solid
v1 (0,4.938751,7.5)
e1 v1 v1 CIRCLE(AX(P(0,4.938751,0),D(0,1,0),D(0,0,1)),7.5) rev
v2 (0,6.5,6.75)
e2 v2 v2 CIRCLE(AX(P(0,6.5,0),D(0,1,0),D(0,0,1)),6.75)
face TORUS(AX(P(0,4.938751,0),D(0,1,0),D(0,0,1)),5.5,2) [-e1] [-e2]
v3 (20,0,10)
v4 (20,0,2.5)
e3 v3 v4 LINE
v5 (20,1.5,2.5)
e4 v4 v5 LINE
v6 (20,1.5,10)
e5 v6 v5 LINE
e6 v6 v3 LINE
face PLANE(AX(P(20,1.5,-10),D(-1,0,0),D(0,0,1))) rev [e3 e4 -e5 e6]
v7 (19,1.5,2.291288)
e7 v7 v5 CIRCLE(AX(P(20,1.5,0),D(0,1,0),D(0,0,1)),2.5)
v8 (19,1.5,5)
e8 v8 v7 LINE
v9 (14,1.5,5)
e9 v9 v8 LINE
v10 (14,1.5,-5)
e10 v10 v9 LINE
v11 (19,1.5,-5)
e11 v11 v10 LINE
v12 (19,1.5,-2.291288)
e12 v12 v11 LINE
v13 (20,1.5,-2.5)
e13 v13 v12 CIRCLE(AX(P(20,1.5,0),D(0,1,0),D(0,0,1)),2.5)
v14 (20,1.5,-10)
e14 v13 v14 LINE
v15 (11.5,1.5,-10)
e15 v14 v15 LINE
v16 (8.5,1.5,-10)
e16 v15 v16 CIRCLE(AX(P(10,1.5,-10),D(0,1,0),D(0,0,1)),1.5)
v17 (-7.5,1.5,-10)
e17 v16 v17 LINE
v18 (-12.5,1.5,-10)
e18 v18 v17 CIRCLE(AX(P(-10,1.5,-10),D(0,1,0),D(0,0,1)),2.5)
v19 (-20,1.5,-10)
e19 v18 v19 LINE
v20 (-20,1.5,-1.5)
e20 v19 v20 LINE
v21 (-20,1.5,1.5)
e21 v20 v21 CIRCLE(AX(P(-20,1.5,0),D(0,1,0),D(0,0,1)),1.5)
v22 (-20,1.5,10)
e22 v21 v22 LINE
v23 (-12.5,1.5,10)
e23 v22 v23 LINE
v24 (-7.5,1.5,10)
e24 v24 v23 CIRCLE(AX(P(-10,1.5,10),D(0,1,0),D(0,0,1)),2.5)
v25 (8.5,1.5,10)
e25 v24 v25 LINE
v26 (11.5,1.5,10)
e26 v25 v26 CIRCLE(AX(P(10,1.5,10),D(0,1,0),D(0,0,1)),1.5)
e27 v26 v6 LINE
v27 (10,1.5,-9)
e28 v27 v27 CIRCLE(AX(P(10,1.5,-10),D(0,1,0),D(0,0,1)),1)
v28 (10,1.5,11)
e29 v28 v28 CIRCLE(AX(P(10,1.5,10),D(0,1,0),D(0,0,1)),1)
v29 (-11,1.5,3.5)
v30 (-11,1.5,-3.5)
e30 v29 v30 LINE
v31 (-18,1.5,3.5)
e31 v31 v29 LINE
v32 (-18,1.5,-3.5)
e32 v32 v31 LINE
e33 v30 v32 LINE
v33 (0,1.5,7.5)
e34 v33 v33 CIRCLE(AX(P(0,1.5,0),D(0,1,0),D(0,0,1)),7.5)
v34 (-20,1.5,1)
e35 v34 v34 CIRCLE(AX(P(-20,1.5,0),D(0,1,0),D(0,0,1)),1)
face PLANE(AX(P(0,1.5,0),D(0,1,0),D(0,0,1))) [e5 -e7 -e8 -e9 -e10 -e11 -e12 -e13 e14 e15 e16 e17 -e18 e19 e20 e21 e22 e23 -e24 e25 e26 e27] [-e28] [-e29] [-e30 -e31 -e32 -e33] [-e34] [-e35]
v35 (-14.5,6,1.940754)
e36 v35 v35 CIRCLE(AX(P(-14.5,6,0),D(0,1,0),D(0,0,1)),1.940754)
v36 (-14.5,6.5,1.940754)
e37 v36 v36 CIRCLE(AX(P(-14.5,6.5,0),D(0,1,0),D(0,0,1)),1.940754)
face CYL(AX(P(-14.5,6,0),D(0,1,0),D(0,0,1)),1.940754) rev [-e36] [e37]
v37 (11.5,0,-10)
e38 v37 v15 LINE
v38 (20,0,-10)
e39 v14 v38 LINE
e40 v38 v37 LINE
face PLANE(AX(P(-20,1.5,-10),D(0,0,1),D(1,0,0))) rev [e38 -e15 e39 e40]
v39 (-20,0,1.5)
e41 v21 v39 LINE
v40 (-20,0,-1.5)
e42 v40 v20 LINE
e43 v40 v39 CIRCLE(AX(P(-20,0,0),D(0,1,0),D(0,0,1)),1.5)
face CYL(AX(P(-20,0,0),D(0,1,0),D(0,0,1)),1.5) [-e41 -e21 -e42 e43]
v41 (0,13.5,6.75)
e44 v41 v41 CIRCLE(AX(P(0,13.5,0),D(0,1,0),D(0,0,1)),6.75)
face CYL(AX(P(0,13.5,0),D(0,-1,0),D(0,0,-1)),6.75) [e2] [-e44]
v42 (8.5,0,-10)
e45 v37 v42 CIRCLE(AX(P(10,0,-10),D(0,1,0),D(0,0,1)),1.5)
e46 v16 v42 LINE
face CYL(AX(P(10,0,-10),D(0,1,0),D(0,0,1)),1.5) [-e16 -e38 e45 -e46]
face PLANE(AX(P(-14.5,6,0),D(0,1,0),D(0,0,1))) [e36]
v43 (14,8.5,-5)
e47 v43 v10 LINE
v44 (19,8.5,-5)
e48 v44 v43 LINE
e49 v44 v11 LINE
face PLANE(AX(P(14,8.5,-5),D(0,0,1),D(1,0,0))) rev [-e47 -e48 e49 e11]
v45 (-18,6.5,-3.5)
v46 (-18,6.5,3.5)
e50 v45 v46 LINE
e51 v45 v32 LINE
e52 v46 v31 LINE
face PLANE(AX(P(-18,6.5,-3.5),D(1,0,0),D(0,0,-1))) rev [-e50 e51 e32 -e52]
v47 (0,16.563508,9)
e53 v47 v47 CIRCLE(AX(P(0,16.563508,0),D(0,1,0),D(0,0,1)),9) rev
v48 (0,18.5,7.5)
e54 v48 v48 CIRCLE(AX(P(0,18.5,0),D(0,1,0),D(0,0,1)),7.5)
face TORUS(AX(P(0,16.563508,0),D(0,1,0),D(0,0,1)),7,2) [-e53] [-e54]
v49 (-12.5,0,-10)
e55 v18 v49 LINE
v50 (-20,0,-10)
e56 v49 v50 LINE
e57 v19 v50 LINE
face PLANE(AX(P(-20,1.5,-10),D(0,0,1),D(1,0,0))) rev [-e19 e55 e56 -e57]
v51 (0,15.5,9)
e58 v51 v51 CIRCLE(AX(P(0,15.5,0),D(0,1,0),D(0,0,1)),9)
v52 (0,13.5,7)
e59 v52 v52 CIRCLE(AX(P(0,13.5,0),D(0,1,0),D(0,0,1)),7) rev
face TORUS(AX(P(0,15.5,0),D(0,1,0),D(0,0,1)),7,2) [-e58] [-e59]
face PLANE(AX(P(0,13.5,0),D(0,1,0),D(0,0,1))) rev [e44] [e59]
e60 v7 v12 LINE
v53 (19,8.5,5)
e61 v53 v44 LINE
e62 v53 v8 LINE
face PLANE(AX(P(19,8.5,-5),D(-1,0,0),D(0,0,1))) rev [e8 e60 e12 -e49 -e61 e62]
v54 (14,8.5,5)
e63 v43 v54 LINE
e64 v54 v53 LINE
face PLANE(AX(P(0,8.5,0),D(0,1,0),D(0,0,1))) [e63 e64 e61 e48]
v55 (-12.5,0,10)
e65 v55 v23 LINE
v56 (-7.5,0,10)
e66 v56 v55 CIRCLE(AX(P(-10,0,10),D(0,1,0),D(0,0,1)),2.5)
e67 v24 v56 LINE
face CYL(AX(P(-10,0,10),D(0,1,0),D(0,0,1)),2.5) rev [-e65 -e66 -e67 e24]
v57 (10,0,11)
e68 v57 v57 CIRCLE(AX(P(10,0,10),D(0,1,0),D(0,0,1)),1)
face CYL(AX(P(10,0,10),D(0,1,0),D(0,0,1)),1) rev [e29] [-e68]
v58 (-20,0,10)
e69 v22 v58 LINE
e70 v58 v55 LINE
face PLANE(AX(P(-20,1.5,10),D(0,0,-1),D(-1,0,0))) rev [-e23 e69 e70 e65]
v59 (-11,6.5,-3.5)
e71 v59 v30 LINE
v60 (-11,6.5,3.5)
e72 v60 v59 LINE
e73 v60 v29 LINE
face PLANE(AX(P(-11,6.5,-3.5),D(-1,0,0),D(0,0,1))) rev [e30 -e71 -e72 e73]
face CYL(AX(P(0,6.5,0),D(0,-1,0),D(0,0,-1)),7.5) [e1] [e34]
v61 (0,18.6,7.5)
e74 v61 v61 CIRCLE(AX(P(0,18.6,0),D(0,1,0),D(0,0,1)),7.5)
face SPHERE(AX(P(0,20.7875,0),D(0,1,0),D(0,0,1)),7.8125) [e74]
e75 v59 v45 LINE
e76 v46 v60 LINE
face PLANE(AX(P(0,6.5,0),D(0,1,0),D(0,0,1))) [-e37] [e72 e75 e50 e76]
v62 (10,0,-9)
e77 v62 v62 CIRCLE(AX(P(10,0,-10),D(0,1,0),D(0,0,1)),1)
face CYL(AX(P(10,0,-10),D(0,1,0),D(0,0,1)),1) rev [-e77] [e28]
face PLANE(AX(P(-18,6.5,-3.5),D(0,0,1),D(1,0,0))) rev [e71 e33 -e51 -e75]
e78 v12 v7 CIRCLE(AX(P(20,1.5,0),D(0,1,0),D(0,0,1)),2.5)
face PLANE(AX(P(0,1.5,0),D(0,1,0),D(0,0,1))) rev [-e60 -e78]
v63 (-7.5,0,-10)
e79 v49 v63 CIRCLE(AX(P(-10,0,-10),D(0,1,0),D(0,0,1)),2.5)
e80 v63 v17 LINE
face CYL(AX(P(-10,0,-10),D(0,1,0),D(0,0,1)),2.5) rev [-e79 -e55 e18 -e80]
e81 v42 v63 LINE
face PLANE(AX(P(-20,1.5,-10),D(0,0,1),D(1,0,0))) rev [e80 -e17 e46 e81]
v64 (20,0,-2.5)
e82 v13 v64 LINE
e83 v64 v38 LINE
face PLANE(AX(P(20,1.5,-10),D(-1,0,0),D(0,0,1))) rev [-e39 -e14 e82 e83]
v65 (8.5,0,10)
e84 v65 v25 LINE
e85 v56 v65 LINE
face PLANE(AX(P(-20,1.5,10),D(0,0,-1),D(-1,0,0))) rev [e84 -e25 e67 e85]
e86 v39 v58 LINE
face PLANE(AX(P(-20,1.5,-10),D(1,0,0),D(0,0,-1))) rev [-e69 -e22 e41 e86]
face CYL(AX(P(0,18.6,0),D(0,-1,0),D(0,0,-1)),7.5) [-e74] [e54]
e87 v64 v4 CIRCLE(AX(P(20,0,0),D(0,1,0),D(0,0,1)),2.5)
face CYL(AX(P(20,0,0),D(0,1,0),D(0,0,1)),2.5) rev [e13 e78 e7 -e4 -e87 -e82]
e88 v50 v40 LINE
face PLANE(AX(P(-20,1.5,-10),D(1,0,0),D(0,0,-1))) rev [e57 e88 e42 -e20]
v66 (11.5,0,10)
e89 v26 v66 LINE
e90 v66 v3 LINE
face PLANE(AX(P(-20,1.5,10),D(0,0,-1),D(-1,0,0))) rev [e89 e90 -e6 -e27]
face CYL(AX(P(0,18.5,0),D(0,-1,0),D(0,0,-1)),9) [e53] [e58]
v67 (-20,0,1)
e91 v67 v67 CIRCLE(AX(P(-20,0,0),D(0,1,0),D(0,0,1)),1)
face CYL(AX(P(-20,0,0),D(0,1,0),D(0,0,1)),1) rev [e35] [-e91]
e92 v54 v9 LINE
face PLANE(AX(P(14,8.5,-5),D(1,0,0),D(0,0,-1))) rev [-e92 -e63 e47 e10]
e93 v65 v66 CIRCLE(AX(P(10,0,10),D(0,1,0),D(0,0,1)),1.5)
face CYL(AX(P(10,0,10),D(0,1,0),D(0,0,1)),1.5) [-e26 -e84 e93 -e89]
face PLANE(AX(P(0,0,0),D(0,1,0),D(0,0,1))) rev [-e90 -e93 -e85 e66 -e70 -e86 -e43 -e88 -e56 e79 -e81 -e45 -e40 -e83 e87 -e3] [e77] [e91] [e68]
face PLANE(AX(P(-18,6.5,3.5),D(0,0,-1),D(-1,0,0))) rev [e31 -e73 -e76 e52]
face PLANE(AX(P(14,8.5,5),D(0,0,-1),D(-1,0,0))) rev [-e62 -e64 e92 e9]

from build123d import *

# Parameters (mm, degrees)
SKETCH1_W           = 40
SKETCH1_H           = 20
BOSS_EXTRUDE1_DEPTH = 1.5
SKETCH2_R           = 1.5
BOSS_EXTRUDE2_DEPTH = 1.5
SKETCH3_R           = 1
SKETCH3_R_2         = 2.5
CUT_EXTRUDE1_DEPTH  = 1.5
SKETCH4_W           = 7
SKETCH4_H           = 7
BOSS_EXTRUDE3_DEPTH = 5
SKETCH5_R           = 1.940753899
CUT_EXTRUDE2_DEPTH  = 0.5
SKETCH6_W           = 5
SKETCH6_H           = 10
BOSS_EXTRUDE4_DEPTH = 7
SKETCH7_R           = 7.5
BOSS_EXTRUDE5_DEPTH = 5
SKETCH8_R           = 6.75
BOSS_EXTRUDE6_DEPTH = 7
SKETCH9_R           = 9
BOSS_EXTRUDE7_DEPTH = 5
SKETCH11_R          = 7.5
BOSS_EXTRUDE8_DEPTH = 0.1
DOME1_FACE_RADIUS   = 7.5
DOME1_HEIGHT        = 10
FILLET2_R           = 2
FILLET4_R           = 2


with BuildPart() as part:
    # Sketch1 → Boss-Extrude1 (new body)
    with BuildSketch(Plane(origin=(0, 0, 0), x_dir=(1, 0, 0), z_dir=(0, 1, 0))):
        Rectangle(SKETCH1_W, SKETCH1_H)
    extrude(amount=BOSS_EXTRUDE1_DEPTH)

    # Sketch2 → Boss-Extrude2 (add)
    with BuildSketch(Plane(origin=(0, 1.5, 0), x_dir=(1, 0, 0), z_dir=(0, 1, 0))):
        with Locations((-20, 0)):
            Circle(SKETCH2_R)
        with Locations((10, 10)):
            Circle(SKETCH2_R)
        with Locations((10, -10)):
            Circle(SKETCH2_R)
    extrude(amount=-BOSS_EXTRUDE2_DEPTH)

    # Sketch3 → Cut-Extrude1 (cut)
    with BuildSketch(Plane(origin=(0, 1.5, 0), x_dir=(1, 0, 0), z_dir=(0, 1, 0))):
        with Locations(Location((-20, 0, 0), (0, 0, 270))):
            Circle(SKETCH3_R)
        with Locations(Location((10, -10, 0), (0, 0, 270))):
            Circle(SKETCH3_R)
        with Locations(Location((10, 10, 0), (0, 0, 270))):
            Circle(SKETCH3_R)
        with Locations((-10, -10)):
            Circle(SKETCH3_R_2)
        with Locations((-10, 10)):
            Circle(SKETCH3_R_2)
        with Locations((20, 0)):
            Circle(SKETCH3_R_2)
    extrude(amount=-CUT_EXTRUDE1_DEPTH, mode=Mode.SUBTRACT)

    # Sketch4 → Boss-Extrude3 (add)
    with BuildSketch(Plane(origin=(0, 1.5, 0), x_dir=(1, 0, 0), z_dir=(0, 1, 0))):
        with Locations((-14.5, 0)):
            Rectangle(SKETCH4_W, SKETCH4_H)
    extrude(amount=BOSS_EXTRUDE3_DEPTH)

    # Sketch5 → Cut-Extrude2 (cut)
    with BuildSketch(Plane(origin=(0, 6.5, 0), x_dir=(1, 0, 0), z_dir=(0, 1, 0))):
        with Locations(Location((-14.5, 0, 0), (0, 0, 270))):
            Circle(SKETCH5_R)
    extrude(amount=-CUT_EXTRUDE2_DEPTH, mode=Mode.SUBTRACT)

    # Sketch6 → Boss-Extrude4 (add)
    with BuildSketch(Plane(origin=(0, 1.5, 0), x_dir=(1, 0, 0), z_dir=(0, 1, 0))):
        with Locations((16.5, 0)):
            Rectangle(SKETCH6_W, SKETCH6_H)
    extrude(amount=BOSS_EXTRUDE4_DEPTH)

    # Sketch7 → Boss-Extrude5 (add)
    with BuildSketch(Plane(origin=(0, 1.5, 0), x_dir=(1, 0, 0), z_dir=(0, 1, 0))):
        with Locations(Location((0, 0, 0), (0, 0, 270))):
            Circle(SKETCH7_R)
    extrude(amount=BOSS_EXTRUDE5_DEPTH)

    # Sketch8 → Boss-Extrude6 (add)
    with BuildSketch(Plane(origin=(0, 6.5, 0), x_dir=(1, 0, 0), z_dir=(0, 1, 0))):
        with Locations(Location((0, 0, 0), (0, 0, 270))):
            Circle(SKETCH8_R)
    extrude(amount=BOSS_EXTRUDE6_DEPTH)

    # Sketch9 → Boss-Extrude7 (add)
    with BuildSketch(Plane(origin=(0, 13.5, 0), x_dir=(1, 0, 0), z_dir=(0, 1, 0))):
        with Locations(Location((0, 0, 0), (0, 0, 270))):
            Circle(SKETCH9_R)
    extrude(amount=BOSS_EXTRUDE7_DEPTH)

    # Sketch11 → Boss-Extrude8 (add)
    with BuildSketch(Plane(origin=(0, 18.5, 0), x_dir=(1, 0, 0), z_dir=(0, 1, 0))):
        with Locations(Location((0, 0, 0), (0, 0, 270))):
            Circle(SKETCH11_R)
    extrude(amount=BOSS_EXTRUDE8_DEPTH)

    # Dome1: a dome of height H over a round flat face of radius A is a cap of a sphere of radius (A * A + H * H) / (2 * H)
    dome1_r = (DOME1_FACE_RADIUS * DOME1_FACE_RADIUS + DOME1_HEIGHT * DOME1_HEIGHT) / (2 * DOME1_HEIGHT)
    dome1_base = Plane((0, 18.6, 0), z_dir=(0, 1, 0))
    with Locations(dome1_base.offset(DOME1_HEIGHT - dome1_r)):
        dome1_ball = Sphere(dome1_r, mode=Mode.PRIVATE)
    add(split(dome1_ball, bisect_by=dome1_base, keep=Keep.TOP, mode=Mode.PRIVATE))

    # Fillet2
    # the kernel refuses this fillet: 2 mm, written as the material it takes off along each edge
    with BuildSketch(Plane(origin=(0, 13.5, 0), x_dir=(0, 0, 1), z_dir=(-1, 0, 0))) as fillet2_piece_1:
        with BuildLine():
            CenterArc((9 - FILLET2_R, FILLET2_R), FILLET2_R, 270, 90)
            Line((9 - FILLET2_R, 0), (9 - FILLET2_R, -FILLET2_R * 0.02))
            Line((9 - FILLET2_R, -FILLET2_R * 0.02), (9 + FILLET2_R * 0.02, -FILLET2_R * 0.02))
            Line((9 + FILLET2_R * 0.02, -FILLET2_R * 0.02), (9 + FILLET2_R * 0.02, FILLET2_R))
            Line((9 + FILLET2_R * 0.02, FILLET2_R), (9, FILLET2_R))
        make_face()
    revolve(axis=Axis((0, 13.5, 0), (0, 1, 0)), mode=Mode.SUBTRACT)
    with BuildSketch(Plane(origin=(0, 18.5, 0), x_dir=(0, 0, 1), z_dir=(-1, 0, 0))) as fillet2_piece_2:
        with BuildLine():
            CenterArc((7, -1.936491673), FILLET2_R, 0, 75.522487814)
            Line((7.5, 0), (7.51, 0.038729833))
            ThreePointArc((7.51, 0.038729833), (8.25, 0.04), (9, 0.04))
            Line((9, 0.04), (9.04, 0))
            Line((9.04, 0), (9.04, -1.936491673))
            Line((9.04, -1.936491673), (9, -1.936491673))
        make_face()
    revolve(axis=Axis((0, 18.5, 0), (0, 1, 0)), mode=Mode.SUBTRACT)

    # Fillet4
    # the kernel refuses this fillet: 2 mm, written as the material it takes off along each edge
    with BuildSketch(Plane(origin=(0, 6.5, 0), x_dir=(0, 0, 1), z_dir=(-1, 0, 0))) as fillet4_piece_1:
        with BuildLine():
            CenterArc((5.5, -1.5612495), FILLET4_R, 0, 51.317812547)
            Line((7.5, -1.5612495), (7.54, -1.5612495))
            Line((7.54, -1.5612495), (7.54, 0))
            Line((7.54, 0), (7.5, 0.04))
            ThreePointArc((7.5, 0.04), (7.125, 0.04), (6.775, 0.03122499))
            Line((6.775, 0.03122499), (6.75, 0))
        make_face()
    revolve(axis=Axis((0, 6.5, 0), (0, 1, 0)), mode=Mode.SUBTRACT)


solid = part.part
